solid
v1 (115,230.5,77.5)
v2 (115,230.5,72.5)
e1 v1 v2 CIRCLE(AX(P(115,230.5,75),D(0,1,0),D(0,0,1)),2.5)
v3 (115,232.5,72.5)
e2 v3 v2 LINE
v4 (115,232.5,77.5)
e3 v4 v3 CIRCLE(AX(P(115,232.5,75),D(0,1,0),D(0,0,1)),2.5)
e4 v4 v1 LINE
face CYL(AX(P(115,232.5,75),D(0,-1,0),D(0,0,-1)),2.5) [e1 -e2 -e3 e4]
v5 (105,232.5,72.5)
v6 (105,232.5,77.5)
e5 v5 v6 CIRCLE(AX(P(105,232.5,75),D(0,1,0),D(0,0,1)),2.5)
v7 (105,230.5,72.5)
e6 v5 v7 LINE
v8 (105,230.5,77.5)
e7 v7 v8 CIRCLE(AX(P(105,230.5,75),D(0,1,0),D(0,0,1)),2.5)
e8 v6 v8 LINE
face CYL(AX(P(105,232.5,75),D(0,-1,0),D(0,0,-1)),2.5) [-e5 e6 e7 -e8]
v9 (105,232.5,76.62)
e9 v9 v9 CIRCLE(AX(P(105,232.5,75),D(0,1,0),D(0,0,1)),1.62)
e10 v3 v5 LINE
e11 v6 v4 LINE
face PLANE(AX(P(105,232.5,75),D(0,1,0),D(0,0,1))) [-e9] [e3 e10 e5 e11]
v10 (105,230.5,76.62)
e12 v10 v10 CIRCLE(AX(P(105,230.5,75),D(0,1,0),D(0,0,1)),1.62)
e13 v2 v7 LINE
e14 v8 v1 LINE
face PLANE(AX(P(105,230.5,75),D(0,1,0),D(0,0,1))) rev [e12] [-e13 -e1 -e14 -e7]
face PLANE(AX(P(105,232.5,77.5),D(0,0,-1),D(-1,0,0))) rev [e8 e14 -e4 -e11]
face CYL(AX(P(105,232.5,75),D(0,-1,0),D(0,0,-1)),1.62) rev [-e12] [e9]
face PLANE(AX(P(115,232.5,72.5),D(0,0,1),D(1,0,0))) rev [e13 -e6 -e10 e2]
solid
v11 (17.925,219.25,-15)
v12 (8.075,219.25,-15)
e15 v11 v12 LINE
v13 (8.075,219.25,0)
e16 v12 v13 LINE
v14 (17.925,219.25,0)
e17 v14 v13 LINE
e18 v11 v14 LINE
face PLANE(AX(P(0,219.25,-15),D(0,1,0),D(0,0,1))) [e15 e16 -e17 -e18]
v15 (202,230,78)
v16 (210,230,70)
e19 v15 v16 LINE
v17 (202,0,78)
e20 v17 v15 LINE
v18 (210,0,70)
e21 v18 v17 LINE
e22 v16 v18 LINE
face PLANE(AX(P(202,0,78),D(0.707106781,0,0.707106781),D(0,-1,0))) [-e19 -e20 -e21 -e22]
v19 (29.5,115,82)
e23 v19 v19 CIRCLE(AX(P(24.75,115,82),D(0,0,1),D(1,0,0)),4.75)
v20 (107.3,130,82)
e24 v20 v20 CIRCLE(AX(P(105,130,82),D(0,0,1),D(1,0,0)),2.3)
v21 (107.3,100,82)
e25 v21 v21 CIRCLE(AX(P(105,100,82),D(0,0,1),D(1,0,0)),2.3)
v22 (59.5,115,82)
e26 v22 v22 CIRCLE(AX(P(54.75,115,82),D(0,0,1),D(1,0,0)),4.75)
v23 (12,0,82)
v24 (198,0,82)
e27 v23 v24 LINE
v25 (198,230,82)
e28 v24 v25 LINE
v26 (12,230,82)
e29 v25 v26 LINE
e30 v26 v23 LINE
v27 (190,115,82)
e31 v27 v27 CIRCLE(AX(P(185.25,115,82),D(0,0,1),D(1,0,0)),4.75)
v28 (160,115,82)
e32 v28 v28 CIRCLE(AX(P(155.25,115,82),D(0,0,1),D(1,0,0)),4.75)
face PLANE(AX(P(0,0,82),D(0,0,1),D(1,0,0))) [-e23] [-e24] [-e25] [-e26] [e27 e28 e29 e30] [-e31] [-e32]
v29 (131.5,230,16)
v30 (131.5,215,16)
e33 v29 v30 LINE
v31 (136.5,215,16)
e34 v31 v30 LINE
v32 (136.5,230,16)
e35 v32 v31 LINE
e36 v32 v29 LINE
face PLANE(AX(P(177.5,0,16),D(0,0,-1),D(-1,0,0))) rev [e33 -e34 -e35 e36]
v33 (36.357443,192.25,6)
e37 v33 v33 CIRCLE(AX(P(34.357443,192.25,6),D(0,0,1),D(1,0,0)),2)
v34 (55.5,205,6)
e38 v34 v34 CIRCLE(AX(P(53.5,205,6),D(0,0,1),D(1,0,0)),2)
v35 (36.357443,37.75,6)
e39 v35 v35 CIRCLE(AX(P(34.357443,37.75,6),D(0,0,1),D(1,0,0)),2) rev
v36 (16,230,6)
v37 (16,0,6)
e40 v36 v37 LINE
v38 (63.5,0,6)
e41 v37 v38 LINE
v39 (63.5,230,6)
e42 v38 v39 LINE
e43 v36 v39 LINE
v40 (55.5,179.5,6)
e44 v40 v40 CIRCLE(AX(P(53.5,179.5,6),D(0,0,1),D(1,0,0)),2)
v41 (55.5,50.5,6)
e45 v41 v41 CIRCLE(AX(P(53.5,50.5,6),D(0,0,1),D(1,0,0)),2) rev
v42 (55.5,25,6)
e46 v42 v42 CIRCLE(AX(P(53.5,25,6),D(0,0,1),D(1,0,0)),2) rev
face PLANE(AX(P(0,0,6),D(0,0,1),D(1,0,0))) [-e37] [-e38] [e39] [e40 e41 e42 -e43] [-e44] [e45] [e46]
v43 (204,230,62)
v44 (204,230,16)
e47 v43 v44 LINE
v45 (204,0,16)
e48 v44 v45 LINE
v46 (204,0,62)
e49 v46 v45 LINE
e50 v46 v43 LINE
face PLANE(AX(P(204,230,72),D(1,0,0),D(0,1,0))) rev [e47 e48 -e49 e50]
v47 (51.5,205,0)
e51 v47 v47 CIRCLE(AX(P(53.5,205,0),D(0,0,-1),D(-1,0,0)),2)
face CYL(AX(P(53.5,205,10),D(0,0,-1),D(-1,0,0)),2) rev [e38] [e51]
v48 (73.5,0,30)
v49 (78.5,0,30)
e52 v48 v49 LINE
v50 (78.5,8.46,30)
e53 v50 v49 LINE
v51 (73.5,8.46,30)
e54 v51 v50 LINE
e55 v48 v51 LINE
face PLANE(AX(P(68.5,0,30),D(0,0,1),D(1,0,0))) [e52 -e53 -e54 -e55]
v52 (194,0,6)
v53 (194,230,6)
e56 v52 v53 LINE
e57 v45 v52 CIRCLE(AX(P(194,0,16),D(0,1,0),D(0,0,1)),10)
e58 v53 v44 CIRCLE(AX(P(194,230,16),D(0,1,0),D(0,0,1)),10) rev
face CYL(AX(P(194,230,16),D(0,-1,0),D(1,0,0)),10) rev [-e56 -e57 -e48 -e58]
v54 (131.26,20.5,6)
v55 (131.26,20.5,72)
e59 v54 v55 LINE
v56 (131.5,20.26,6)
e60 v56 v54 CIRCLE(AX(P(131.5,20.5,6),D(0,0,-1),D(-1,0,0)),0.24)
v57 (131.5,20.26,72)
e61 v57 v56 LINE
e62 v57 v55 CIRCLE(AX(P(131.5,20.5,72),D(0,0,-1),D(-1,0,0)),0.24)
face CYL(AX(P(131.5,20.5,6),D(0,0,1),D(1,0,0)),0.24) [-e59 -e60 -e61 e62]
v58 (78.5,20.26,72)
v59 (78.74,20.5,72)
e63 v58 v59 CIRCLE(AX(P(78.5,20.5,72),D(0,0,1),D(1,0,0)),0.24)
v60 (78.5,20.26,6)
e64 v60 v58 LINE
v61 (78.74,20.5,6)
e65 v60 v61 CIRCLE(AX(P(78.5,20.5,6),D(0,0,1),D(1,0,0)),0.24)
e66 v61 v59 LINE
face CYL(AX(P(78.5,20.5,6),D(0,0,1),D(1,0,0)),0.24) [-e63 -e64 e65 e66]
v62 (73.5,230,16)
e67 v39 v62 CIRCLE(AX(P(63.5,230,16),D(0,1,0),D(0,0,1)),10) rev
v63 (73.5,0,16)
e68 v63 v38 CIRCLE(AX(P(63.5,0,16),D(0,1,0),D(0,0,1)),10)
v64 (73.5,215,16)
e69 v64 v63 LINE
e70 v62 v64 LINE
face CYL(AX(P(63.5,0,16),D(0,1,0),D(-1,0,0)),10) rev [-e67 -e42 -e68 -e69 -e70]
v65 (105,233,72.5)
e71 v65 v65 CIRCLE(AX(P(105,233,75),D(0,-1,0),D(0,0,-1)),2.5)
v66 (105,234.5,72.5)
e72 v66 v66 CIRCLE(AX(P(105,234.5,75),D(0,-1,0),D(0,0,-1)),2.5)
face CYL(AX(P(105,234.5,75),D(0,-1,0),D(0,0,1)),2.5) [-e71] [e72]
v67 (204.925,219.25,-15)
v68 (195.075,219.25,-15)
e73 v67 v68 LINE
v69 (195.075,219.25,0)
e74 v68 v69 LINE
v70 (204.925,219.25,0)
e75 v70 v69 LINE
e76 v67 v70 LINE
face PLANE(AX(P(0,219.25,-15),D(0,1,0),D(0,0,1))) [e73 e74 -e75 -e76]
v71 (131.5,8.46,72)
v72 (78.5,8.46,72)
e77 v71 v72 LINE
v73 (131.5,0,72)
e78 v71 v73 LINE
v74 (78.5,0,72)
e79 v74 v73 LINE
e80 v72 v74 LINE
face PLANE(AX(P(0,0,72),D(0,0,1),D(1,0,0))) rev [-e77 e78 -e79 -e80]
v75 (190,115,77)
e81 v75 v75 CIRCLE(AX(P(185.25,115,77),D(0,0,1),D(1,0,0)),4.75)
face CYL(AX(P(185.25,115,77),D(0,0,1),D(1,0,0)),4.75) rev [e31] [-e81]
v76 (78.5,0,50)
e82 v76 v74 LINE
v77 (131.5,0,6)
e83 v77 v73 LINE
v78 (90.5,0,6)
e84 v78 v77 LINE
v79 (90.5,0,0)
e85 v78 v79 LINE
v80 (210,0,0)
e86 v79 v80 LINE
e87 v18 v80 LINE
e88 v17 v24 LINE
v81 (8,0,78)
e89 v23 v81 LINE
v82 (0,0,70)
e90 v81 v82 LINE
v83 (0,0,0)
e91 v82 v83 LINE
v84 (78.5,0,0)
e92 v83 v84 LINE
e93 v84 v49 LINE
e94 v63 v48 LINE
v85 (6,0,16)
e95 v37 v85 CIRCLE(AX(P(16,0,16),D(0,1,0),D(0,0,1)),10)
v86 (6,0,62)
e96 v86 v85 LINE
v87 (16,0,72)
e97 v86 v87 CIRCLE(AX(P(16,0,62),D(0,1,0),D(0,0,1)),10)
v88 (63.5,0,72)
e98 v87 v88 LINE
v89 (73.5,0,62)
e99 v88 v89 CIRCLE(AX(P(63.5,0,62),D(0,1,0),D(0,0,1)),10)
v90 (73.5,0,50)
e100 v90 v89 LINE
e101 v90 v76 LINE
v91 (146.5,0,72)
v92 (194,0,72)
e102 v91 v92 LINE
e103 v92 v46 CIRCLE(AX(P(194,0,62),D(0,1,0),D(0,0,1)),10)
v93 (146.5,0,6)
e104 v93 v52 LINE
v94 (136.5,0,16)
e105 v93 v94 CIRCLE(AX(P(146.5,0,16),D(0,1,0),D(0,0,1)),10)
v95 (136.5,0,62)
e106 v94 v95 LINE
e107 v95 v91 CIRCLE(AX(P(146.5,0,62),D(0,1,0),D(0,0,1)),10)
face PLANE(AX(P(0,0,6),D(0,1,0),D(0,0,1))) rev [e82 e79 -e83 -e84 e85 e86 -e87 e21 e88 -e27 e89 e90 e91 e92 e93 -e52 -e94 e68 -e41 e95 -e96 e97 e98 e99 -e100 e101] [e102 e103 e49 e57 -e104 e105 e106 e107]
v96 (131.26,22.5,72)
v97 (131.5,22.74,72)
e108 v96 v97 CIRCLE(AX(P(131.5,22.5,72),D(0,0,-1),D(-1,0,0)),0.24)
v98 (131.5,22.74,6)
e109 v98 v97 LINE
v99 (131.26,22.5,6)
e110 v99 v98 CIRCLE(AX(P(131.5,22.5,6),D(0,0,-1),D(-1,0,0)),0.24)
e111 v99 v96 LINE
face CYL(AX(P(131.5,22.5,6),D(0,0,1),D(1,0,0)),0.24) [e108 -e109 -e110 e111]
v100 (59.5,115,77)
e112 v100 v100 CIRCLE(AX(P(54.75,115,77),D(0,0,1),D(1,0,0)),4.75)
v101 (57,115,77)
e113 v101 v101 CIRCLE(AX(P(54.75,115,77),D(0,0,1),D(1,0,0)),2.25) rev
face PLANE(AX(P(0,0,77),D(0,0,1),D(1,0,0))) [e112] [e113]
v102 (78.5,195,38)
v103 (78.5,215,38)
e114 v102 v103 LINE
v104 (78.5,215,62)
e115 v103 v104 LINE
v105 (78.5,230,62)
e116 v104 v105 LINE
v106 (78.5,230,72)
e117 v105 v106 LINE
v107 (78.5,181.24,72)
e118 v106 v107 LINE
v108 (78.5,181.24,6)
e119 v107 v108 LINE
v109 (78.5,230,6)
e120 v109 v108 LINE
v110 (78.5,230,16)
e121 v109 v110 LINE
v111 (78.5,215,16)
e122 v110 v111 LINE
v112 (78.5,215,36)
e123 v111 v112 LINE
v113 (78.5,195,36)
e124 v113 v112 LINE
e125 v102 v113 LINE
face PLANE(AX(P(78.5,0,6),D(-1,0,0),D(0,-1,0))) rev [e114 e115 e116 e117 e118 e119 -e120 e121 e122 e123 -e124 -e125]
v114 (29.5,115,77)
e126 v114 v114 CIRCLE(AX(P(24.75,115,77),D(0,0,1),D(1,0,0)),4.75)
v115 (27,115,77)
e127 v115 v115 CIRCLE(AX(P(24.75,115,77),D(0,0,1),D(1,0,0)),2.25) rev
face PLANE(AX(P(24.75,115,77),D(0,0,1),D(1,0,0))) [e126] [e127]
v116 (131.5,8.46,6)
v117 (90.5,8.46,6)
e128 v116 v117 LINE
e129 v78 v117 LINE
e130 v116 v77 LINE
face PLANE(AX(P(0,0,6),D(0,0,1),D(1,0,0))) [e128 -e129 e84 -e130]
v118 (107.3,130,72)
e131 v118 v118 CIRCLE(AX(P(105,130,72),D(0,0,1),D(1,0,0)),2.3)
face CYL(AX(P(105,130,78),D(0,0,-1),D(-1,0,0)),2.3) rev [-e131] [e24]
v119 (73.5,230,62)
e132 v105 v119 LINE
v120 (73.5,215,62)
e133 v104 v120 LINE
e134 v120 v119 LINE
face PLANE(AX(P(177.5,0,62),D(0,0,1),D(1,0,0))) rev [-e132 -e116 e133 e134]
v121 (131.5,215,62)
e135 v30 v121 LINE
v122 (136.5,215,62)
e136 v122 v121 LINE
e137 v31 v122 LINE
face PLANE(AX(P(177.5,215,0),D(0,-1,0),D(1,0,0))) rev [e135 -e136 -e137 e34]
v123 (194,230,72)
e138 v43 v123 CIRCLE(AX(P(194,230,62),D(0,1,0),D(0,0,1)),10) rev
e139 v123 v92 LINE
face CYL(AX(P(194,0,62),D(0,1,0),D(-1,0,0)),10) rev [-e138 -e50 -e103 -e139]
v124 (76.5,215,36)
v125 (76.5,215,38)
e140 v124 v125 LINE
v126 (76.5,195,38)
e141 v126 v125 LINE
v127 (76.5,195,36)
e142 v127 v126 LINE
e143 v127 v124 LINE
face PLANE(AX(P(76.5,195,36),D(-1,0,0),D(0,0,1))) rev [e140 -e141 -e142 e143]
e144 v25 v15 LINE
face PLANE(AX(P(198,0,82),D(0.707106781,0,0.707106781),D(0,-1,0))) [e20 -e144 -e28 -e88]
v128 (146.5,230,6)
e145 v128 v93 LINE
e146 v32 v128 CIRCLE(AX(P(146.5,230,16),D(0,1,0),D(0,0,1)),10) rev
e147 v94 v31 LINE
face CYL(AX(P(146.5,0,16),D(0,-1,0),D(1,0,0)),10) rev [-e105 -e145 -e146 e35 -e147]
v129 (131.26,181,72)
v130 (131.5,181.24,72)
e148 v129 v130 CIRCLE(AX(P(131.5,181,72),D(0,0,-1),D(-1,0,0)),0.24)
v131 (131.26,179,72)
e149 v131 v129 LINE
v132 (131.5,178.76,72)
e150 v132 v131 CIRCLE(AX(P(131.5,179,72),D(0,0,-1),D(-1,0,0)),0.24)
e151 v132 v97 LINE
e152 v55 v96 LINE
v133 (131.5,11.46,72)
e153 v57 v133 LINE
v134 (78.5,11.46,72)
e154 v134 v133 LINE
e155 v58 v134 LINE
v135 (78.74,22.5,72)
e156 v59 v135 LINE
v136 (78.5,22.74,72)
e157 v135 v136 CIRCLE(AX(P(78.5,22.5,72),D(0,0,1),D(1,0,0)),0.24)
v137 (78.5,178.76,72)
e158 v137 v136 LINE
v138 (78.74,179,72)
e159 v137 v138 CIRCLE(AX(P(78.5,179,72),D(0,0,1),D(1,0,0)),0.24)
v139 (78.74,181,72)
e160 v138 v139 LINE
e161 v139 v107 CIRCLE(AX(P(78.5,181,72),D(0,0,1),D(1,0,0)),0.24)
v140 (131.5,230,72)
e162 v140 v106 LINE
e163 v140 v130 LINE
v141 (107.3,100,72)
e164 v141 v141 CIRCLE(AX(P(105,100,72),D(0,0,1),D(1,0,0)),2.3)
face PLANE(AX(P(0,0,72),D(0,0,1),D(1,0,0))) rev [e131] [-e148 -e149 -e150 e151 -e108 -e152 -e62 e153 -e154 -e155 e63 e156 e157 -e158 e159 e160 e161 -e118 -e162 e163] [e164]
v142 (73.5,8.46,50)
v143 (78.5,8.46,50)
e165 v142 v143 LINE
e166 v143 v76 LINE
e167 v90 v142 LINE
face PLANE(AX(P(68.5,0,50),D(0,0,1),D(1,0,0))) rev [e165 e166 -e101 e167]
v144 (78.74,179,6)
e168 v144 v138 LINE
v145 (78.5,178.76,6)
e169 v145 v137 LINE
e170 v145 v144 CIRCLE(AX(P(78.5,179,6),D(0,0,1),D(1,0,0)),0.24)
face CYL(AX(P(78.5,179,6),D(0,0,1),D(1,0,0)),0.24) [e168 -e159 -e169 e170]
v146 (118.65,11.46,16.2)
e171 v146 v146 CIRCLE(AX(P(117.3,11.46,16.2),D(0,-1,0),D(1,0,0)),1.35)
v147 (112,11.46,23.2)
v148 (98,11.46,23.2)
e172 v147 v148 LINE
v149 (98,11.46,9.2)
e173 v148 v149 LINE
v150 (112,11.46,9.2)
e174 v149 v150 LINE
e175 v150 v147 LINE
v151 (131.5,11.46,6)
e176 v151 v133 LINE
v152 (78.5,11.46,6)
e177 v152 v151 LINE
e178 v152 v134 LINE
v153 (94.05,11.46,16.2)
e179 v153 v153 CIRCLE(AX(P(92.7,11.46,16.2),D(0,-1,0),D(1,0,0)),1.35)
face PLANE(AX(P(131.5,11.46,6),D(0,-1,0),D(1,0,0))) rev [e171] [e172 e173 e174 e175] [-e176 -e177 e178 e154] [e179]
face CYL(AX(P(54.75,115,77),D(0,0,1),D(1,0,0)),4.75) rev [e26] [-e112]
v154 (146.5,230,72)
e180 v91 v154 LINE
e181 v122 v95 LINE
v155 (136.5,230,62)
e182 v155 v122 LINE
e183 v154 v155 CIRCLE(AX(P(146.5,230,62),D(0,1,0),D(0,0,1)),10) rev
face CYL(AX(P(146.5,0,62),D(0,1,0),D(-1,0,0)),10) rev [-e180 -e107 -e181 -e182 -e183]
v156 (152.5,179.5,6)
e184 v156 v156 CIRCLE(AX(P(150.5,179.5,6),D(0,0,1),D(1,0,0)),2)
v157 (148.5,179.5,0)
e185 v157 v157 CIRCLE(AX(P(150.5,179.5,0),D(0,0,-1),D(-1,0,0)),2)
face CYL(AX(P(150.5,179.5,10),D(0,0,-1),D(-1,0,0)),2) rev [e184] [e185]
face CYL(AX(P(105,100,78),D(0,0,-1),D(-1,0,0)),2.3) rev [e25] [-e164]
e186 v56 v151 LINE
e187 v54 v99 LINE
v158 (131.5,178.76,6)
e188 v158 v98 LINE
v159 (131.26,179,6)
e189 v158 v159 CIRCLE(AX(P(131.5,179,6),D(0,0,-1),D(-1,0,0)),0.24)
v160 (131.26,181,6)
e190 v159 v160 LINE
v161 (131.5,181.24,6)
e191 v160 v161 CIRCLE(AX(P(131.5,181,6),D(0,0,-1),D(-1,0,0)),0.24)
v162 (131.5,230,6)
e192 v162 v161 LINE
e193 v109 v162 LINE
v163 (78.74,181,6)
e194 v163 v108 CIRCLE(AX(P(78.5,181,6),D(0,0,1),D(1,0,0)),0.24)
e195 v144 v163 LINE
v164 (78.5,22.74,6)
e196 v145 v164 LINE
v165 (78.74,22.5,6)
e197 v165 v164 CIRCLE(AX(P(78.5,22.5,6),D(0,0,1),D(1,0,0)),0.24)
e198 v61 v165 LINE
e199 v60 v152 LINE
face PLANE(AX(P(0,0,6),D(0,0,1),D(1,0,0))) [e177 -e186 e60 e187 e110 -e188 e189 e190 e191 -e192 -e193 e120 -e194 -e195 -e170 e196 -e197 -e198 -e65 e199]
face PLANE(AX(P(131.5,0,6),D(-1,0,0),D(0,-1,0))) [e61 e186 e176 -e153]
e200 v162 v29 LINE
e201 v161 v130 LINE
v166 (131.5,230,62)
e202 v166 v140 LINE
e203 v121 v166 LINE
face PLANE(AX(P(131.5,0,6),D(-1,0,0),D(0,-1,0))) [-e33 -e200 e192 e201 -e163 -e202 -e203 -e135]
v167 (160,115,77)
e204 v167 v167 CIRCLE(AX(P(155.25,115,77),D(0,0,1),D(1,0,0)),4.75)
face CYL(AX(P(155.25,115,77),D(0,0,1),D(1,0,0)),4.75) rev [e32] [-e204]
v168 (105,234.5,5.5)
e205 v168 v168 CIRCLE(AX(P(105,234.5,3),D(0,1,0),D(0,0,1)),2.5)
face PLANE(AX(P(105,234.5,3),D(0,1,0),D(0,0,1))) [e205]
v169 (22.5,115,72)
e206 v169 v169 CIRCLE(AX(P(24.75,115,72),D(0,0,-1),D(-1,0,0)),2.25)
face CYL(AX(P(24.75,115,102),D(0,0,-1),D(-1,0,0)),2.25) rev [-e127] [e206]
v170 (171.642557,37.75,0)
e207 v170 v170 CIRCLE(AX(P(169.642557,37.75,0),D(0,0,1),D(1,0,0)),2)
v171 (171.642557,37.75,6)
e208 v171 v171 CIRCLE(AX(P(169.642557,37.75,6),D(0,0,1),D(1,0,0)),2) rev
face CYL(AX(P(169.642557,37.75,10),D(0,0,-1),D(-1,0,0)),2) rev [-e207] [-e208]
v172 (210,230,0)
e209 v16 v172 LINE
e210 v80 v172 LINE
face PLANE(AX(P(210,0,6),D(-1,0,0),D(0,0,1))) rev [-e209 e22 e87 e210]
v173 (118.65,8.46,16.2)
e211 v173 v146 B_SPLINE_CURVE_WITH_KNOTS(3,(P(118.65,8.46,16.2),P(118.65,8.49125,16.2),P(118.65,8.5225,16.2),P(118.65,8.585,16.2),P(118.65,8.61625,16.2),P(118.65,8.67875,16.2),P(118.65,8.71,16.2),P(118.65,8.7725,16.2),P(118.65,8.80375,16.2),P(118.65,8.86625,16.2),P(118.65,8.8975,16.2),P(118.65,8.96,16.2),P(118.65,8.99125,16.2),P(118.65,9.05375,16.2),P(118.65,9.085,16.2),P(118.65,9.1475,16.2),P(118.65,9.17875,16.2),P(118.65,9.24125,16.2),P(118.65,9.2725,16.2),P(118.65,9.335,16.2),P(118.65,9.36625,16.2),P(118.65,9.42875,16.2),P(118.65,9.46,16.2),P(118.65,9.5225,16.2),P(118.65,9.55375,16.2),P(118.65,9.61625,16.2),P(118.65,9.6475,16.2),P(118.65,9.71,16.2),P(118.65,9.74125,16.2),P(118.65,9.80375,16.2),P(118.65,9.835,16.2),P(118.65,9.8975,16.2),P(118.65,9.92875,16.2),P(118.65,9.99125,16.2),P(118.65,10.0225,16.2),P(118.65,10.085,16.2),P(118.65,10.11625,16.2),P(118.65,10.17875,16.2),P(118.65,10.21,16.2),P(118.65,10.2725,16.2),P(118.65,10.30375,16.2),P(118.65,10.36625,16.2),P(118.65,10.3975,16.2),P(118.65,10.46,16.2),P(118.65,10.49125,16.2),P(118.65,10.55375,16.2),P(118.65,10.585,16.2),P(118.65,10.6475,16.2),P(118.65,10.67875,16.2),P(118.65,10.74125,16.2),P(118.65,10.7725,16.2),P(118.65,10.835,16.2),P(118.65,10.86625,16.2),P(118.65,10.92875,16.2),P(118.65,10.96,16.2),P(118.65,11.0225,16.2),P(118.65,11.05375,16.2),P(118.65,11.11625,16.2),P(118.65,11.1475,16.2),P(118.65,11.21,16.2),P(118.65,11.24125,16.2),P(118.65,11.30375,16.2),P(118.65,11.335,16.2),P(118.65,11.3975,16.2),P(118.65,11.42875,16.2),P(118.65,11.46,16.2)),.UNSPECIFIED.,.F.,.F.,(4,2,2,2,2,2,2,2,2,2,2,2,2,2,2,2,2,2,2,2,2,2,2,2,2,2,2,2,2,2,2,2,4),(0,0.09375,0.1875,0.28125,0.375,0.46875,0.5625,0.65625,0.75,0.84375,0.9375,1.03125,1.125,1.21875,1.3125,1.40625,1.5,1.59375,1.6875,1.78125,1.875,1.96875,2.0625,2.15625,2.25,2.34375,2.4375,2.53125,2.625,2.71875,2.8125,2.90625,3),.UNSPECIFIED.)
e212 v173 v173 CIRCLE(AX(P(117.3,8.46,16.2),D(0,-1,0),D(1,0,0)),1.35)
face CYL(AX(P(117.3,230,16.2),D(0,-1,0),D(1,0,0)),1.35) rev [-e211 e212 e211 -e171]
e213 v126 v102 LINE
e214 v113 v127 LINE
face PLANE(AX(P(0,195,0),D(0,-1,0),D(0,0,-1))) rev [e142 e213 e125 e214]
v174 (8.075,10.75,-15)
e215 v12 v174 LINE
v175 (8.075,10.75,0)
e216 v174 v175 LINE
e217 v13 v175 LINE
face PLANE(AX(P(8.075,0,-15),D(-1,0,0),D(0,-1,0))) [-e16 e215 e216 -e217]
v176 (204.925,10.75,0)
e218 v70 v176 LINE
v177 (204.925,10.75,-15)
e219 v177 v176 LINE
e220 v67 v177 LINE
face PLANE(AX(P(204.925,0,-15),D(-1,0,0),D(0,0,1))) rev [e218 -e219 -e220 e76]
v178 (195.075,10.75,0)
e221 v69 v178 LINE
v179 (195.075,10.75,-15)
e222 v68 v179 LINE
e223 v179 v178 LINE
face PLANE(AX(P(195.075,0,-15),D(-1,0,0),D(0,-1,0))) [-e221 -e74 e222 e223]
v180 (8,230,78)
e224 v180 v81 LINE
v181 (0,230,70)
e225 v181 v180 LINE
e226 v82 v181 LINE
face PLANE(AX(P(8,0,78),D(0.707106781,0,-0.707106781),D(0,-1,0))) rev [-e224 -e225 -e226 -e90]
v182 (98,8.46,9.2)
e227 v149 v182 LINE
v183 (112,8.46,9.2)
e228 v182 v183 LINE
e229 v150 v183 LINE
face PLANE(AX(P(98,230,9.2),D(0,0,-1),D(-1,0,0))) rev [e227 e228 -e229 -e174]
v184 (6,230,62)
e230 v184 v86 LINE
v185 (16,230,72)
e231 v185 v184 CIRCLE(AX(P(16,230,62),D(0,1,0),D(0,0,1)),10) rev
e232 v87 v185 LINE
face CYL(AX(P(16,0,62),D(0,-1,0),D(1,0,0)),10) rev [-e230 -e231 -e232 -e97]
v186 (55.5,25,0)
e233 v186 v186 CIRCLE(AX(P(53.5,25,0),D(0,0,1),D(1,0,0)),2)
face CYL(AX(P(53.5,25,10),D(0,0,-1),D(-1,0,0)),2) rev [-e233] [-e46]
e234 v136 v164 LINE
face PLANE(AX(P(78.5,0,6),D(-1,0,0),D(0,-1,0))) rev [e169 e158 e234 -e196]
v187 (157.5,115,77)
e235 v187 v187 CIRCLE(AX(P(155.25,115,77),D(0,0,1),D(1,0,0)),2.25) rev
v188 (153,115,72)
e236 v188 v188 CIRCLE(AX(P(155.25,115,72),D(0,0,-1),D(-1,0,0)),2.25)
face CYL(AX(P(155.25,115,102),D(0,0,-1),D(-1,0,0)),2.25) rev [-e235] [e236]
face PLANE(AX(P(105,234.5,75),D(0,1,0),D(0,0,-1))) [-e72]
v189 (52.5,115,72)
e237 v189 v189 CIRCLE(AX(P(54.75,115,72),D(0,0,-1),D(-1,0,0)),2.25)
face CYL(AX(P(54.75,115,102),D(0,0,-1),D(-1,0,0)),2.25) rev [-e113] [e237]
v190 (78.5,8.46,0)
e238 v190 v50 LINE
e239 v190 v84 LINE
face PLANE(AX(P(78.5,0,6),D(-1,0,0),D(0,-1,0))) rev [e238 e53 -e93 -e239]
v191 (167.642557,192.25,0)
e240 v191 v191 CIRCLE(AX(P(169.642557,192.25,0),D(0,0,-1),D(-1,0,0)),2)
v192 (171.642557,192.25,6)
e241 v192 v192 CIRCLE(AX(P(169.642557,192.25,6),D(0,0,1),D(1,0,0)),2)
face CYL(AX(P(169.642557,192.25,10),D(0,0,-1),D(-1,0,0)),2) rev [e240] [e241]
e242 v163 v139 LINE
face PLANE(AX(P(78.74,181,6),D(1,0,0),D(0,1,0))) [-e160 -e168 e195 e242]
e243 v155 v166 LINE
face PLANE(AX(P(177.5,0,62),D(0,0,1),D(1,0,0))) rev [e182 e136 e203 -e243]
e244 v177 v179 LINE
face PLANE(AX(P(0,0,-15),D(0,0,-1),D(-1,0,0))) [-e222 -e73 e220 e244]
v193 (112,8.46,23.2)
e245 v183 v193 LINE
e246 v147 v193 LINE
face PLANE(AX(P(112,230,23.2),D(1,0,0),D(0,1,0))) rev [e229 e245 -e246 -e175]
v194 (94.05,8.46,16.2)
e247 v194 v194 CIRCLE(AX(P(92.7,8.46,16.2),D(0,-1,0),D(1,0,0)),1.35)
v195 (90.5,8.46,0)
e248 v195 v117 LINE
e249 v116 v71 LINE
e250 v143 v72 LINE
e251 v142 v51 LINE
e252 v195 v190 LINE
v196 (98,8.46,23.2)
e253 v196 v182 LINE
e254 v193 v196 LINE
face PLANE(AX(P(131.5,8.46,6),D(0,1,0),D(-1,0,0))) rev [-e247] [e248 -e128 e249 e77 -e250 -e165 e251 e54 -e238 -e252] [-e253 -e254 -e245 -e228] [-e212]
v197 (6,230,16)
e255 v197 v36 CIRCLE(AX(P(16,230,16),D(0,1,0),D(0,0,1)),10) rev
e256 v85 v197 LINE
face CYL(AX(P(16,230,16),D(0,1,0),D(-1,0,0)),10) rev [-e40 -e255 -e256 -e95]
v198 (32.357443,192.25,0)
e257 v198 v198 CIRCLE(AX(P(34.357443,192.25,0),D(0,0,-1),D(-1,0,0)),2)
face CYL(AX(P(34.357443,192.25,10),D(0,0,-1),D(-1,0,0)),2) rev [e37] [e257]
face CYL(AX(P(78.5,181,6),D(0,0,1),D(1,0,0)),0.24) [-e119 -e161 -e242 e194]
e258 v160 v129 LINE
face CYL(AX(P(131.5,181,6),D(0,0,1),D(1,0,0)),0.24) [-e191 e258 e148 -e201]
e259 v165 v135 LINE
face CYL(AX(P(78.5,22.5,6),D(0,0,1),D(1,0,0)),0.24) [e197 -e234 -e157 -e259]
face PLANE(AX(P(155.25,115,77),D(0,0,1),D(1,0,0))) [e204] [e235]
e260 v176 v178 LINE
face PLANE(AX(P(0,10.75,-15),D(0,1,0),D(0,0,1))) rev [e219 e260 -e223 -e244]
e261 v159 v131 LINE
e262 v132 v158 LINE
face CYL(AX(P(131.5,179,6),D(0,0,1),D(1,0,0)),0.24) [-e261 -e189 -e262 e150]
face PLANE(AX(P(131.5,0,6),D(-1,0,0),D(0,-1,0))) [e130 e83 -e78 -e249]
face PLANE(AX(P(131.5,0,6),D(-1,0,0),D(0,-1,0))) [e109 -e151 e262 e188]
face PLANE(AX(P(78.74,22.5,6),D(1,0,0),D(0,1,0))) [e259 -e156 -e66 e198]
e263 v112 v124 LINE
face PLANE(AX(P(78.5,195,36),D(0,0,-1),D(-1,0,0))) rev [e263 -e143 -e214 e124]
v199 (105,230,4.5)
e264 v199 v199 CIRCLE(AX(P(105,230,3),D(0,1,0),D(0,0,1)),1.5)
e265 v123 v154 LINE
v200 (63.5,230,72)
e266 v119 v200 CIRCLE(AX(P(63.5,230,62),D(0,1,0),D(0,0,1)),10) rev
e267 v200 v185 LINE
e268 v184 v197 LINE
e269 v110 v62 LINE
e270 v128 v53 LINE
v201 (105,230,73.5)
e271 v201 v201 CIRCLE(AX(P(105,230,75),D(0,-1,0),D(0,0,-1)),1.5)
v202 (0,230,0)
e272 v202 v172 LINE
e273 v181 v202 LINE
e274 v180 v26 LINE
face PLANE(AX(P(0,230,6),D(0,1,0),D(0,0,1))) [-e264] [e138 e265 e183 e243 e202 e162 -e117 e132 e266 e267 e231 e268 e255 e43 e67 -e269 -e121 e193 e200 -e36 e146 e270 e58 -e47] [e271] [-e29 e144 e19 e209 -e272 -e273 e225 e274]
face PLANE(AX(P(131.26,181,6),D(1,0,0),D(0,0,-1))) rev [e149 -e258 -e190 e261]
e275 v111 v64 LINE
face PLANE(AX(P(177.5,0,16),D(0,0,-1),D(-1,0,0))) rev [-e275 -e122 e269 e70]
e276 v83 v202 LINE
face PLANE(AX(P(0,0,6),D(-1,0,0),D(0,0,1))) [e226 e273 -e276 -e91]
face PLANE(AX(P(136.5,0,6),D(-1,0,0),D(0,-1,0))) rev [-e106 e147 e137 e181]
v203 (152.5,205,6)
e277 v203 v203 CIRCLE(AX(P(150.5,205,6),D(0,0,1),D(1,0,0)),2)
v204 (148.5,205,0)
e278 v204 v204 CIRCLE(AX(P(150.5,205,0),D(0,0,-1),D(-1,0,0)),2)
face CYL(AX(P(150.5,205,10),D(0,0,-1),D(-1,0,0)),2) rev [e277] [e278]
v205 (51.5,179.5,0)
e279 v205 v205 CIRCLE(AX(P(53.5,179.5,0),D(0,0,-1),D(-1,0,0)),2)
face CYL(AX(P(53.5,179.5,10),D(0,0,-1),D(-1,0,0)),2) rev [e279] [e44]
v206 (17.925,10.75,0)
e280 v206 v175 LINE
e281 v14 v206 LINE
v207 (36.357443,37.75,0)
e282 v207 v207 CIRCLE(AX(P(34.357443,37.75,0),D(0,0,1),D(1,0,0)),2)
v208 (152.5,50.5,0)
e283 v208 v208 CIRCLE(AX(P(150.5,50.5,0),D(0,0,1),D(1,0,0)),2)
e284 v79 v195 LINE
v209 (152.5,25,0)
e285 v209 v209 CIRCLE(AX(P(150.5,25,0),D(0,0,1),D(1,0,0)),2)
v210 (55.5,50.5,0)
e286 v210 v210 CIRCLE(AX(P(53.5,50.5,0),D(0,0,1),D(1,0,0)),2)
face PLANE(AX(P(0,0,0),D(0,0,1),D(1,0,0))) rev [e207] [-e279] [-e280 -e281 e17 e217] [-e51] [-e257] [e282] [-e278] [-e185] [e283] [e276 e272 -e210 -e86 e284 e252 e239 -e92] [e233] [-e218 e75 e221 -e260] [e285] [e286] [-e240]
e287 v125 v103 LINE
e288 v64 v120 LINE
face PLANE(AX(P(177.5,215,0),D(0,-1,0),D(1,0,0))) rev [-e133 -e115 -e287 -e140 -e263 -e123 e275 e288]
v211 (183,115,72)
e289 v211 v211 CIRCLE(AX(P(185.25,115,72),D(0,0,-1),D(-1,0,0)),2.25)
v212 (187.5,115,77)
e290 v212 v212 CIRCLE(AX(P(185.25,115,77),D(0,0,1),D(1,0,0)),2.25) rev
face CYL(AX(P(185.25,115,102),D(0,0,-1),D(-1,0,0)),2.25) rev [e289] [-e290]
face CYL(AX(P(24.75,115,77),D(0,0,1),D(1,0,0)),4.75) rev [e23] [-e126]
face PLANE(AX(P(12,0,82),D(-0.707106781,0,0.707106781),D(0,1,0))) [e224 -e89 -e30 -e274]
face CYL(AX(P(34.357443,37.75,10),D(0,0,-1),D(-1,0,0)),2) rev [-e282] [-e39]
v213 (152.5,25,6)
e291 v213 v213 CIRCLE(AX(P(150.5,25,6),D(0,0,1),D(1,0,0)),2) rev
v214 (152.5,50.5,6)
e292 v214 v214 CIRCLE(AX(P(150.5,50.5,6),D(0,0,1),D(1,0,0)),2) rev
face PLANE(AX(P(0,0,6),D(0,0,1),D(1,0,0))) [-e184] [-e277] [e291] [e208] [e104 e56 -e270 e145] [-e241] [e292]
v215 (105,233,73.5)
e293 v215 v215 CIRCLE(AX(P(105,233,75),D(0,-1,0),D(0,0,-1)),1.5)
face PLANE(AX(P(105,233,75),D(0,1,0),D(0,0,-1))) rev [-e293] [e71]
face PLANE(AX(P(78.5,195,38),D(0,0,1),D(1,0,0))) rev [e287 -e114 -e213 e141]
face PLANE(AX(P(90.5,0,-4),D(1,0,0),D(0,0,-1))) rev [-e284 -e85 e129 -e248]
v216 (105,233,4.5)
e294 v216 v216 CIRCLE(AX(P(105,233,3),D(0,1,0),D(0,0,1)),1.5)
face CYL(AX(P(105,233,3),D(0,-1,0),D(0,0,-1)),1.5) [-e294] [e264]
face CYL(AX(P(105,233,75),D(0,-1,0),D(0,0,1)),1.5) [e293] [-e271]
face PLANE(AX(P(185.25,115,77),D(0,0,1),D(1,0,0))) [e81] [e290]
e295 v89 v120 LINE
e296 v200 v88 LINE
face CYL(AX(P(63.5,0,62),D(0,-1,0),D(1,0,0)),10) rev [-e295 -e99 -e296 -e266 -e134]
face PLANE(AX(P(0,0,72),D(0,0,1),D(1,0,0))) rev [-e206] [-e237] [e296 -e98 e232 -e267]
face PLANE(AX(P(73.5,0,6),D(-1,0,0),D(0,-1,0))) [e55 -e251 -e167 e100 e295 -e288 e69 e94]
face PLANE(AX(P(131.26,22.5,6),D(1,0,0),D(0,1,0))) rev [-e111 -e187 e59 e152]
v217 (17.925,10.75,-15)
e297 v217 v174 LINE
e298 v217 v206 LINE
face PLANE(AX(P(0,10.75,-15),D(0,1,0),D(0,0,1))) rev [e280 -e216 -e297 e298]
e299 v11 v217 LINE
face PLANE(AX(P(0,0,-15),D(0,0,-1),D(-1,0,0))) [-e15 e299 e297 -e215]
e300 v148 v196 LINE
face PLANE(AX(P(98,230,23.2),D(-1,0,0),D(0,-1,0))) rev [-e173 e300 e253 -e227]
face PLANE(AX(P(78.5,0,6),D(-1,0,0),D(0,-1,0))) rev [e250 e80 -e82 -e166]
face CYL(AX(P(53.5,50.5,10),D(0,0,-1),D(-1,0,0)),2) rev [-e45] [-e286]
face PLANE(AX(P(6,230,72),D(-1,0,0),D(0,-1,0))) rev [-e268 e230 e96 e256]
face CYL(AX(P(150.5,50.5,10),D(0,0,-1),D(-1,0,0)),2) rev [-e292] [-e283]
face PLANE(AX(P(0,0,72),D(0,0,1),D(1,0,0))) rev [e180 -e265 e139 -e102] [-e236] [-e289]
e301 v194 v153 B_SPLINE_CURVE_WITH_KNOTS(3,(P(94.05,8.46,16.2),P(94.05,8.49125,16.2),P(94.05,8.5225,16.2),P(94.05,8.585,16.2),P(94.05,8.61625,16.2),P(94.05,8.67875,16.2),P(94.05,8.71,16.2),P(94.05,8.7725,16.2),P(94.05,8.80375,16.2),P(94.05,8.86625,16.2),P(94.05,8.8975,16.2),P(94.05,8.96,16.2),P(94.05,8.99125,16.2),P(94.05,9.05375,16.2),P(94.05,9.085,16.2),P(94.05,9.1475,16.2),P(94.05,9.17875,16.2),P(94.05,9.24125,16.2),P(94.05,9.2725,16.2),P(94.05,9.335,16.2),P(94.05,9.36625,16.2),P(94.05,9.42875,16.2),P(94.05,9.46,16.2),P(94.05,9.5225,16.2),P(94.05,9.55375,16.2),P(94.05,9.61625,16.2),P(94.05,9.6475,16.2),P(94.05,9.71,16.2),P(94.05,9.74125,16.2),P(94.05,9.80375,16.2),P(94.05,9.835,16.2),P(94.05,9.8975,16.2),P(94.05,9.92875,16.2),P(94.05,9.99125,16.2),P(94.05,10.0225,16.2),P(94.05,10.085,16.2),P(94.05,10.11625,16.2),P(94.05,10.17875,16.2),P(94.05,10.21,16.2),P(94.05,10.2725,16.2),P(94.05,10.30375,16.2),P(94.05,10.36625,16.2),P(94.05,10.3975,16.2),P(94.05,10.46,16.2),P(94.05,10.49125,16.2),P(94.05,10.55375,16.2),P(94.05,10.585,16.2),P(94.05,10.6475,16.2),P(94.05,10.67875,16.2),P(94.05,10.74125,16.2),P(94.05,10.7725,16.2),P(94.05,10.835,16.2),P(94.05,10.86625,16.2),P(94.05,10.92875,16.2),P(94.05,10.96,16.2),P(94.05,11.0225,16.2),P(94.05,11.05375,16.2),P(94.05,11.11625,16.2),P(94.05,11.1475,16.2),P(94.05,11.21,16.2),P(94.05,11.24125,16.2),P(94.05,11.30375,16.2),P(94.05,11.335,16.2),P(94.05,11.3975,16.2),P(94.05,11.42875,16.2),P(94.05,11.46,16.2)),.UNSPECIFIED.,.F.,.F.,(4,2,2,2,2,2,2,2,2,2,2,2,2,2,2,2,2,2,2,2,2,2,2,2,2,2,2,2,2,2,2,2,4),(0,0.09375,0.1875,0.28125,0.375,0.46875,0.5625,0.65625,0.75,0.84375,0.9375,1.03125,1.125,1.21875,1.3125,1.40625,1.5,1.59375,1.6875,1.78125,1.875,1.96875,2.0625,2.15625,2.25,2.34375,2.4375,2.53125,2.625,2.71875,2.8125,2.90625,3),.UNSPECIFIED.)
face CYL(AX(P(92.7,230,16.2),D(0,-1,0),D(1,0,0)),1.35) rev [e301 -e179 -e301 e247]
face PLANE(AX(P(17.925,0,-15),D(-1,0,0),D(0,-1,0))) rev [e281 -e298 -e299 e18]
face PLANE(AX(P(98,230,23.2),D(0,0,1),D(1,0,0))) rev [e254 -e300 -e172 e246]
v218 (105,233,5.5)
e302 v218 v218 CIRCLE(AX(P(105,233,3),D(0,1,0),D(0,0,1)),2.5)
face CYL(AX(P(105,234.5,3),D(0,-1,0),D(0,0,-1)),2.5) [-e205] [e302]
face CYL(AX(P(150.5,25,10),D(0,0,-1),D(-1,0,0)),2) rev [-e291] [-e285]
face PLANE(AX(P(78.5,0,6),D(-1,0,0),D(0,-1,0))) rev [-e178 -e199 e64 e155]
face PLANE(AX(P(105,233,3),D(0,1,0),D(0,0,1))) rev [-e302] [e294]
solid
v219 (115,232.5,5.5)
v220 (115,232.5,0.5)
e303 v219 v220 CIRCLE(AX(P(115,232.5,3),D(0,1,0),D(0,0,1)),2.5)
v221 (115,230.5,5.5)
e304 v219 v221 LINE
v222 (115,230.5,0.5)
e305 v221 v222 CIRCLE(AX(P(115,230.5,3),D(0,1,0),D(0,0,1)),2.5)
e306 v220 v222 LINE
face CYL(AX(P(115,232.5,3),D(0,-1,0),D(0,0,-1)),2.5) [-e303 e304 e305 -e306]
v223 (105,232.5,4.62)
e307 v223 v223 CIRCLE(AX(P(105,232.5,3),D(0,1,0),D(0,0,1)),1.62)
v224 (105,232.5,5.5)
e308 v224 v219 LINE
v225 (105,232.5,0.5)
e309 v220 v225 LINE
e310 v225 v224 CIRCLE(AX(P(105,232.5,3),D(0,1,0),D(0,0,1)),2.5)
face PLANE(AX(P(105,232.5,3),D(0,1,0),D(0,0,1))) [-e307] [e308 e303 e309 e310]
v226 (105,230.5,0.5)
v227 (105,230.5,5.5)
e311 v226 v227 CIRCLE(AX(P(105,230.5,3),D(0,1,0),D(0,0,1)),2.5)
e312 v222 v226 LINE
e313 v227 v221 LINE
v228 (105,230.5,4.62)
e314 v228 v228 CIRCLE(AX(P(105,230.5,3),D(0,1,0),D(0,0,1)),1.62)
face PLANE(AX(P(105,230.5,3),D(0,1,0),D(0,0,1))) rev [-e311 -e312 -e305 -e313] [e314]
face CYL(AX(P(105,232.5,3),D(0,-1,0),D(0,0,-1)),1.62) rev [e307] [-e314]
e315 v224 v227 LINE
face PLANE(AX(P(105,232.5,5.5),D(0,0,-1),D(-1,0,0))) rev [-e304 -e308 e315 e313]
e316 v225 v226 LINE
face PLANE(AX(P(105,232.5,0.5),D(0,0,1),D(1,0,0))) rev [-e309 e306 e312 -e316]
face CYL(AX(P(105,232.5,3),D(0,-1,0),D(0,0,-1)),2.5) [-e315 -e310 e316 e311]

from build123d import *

# Parameters (mm, degrees)
SKETCH_1_W           = 210
SKETCH_1_H           = 230
EXTRUDE_1_DEPTH      = 6
SKETCH_2_W           = 9.85
SKETCH_2_H           = 208.5
EXTRUDE_3_DEPTH      = 15
SKETCH_3_R           = 2
CUT_EXTRUDE_1_DEPTH  = 10
SKETCH_17_W          = 6
SKETCH_17_H          = 230
EXTRUDE_9_DEPTH      = 66
EXTRUDE_10_DEPTH     = 6
CHAMFER_3_SIZE       = 8
SKETCH_19_W          = 5
SKETCH_19_H          = 230
EXTRUDE_11_DEPTH     = 66
FILLET_4_R           = 10
SKETCH_21_R          = 2.3
CUT_EXTRUDE_9_DEPTH  = 6
EXTRUDE_13_DEPTH     = 66
SKETCH_28_W          = 53
SKETCH_28_H          = 3
EXTRUDE_14_DEPTH     = 66
SKETCH_30_W          = 2
SKETCH_30_H          = 2
CUT_EXTRUDE_10_DEPTH = 35
SKETCH_31_R          = 1.35
SKETCH_31_W          = 14
SKETCH_31_H          = 14
CUT_EXTRUDE_11_DEPTH = 316.06185361
SKETCH_34_R          = 2.25
CUT_EXTRUDE_14_DEPTH = 30
SKETCH_36_R          = 2.25
CUT_EXTRUDE_15_DEPTH = 30
SKETCH_39_W          = 46
SKETCH_39_H          = 15
CUT_EXTRUDE_16_DEPTH = 104
SKETCH_40_R          = 1.5
EXTRUDE_16_DEPTH     = 3
SKETCH_41_R          = 2.5
EXTRUDE_17_DEPTH     = 1.5
SKETCH_44_R          = 1.62
EXTRUDE_19_DEPTH     = 2
SKETCH_46_R          = 1.62
EXTRUDE_20_DEPTH     = 2
SKETCH_49_W          = 12
SKETCH_49_H          = 8.46
CUT_EXTRUDE_17_DEPTH = 10
SKETCH_50_W          = 20
SKETCH_50_H          = 8.46
CUT_EXTRUDE_18_DEPTH = 10
SKETCH_51_W          = 194
SKETCH_51_H          = 230
EXTRUDE_22_DEPTH     = 4
CHAMFER_6_SIZE       = 4
CUT_EXTRUDE_START    = -5
SKETCH_54_R          = 4.75
SKETCH_54_R_2        = 2.3
CUT_EXTRUDE_21_DEPTH = 5


with BuildPart() as part:
    # 草图1 → 凸台-拉伸1 (new body)
    with BuildSketch(Plane.XY):
        with Locations((105, 115)):
            Rectangle(SKETCH_1_W, SKETCH_1_H)
    extrude(amount=EXTRUDE_1_DEPTH)

    # 草图2 → 凸台-拉伸3 (add)
    with BuildSketch(Plane(origin=(0, 0, 0), x_dir=(-1, 0, 0), z_dir=(0, 0, -1))):
        with Locations((-200, 115)):
            Rectangle(SKETCH_2_W, SKETCH_2_H)
        with Locations((-13, 115)):
            Rectangle(SKETCH_2_W, SKETCH_2_H)
    extrude(amount=EXTRUDE_3_DEPTH)

    # 草图3 → 切除-拉伸1 (cut)
    with BuildSketch(Plane(origin=(0, 0, 0), x_dir=(-1, 0, 0), z_dir=(0, 0, -1))):
        with Locations((-169.6425573, 192.25)):
            Circle(SKETCH_3_R)
        with Locations((-150.5, 205)):
            Circle(SKETCH_3_R)
        with Locations((-150.5, 179.5)):
            Circle(SKETCH_3_R)
        with Locations(Location((-150.5, 50.5, 0), (0, 0, 180))):
            Circle(SKETCH_3_R)
        with Locations(Location((-150.5, 25, 0), (0, 0, 180))):
            Circle(SKETCH_3_R)
        with Locations(Location((-169.6425573, 37.75, 0), (0, 0, 180))):
            Circle(SKETCH_3_R)
        with Locations((-34.3574427, 192.25)):
            Circle(SKETCH_3_R)
        with Locations((-53.5, 205)):
            Circle(SKETCH_3_R)
        with Locations((-53.5, 179.5)):
            Circle(SKETCH_3_R)
        with Locations(Location((-53.5, 50.5, 0), (0, 0, 180))):
            Circle(SKETCH_3_R)
        with Locations(Location((-53.5, 25, 0), (0, 0, 180))):
            Circle(SKETCH_3_R)
        with Locations(Location((-34.3574427, 37.75, 0), (0, 0, 180))):
            Circle(SKETCH_3_R)
    extrude(amount=-CUT_EXTRUDE_1_DEPTH, mode=Mode.SUBTRACT)

    # 草图17 → 凸台-拉伸9 (add)
    with BuildSketch(Plane.XY.offset(6)):
        with Locations((3, 115)):
            Rectangle(SKETCH_17_W, SKETCH_17_H)
        with Locations((207, 115)):
            Rectangle(SKETCH_17_W, SKETCH_17_H)
    extrude(amount=EXTRUDE_9_DEPTH)

    # 草图18 → 凸台-拉伸10 (add)
    with BuildSketch(Plane.XY.offset(72)):
        Polygon((210, 230), (204, 230), (6, 230), (0, 230), (0, 0), (6, 0), (204, 0), (210, 0), align=None)
    extrude(amount=EXTRUDE_10_DEPTH)

    # 倒角3
    chamfer_3_edges = [part.edges().sort_by_distance(p)[0] for p in [
        (210, 115, 78),
        (0, 115, 78),
    ]]
    chamfer(chamfer_3_edges, length=CHAMFER_3_SIZE)

    # 草图19 → 凸台-拉伸11 (add)
    with BuildSketch(Plane(origin=(0, 0, 72), x_dir=(-1, 0, 0), z_dir=(0, 0, -1))):
        with Locations((-134, 115)):
            Rectangle(SKETCH_19_W, SKETCH_19_H)
        with Locations((-76, 115)):
            Rectangle(SKETCH_19_W, SKETCH_19_H)
    extrude(amount=EXTRUDE_11_DEPTH)

    # 圆角4
    fillet_4_edges = [part.edges().sort_by_distance(p)[0] for p in [
        (6, 115, 6),
        (6, 115, 72),
        (204, 115, 6),
        (204, 115, 72),
        (73.5, 115, 6),
        (73.5, 115, 72),
        (136.5, 115, 72),
        (136.5, 115, 6),
    ]]
    fillet(fillet_4_edges, radius=FILLET_4_R)

    # 草图21 → 切除-拉伸9 (cut)
    with BuildSketch(Plane.XY.offset(72)):
        with Locations((105, 130)):
            Circle(SKETCH_21_R)
        with Locations((105, 100)):
            Circle(SKETCH_21_R)
    extrude(amount=CUT_EXTRUDE_9_DEPTH, mode=Mode.SUBTRACT)

    # 草图26 → 凸台-拉伸13 (add)
    with BuildSketch(Plane(origin=(0, 0, 72), x_dir=(-1, 0, 0), z_dir=(0, 0, -1))):
        with BuildLine():
            Line((-131.26, 181), (-131.26, 179))
            ThreePointArc((-131.26, 179), (-131.5, 178.76), (-131.74, 179))
            Line((-131.74, 179), (-131.74, 181))
            ThreePointArc((-131.74, 181), (-131.5, 181.24), (-131.26, 181))
        make_face()
        with BuildLine():
            Line((-131.26, 22.5), (-131.26, 20.5))
            ThreePointArc((-131.26, 20.5), (-131.5, 20.26), (-131.74, 20.5))
            Line((-131.74, 20.5), (-131.74, 22.5))
            ThreePointArc((-131.74, 22.5), (-131.5, 22.74), (-131.26, 22.5))
        make_face()
    extrude_13 = extrude(amount=EXTRUDE_13_DEPTH)

    # 镜向2: 凸台-拉伸13 across plane
    add(extrude_13.mirror(Plane.ZY.offset(-105)))

    # 草图28 → 凸台-拉伸14 (add)
    with BuildSketch(Plane(origin=(0, 0, 72), x_dir=(-1, 0, 0), z_dir=(0, 0, -1))):
        with Locations((-105, 9.96)):
            Rectangle(SKETCH_28_W, SKETCH_28_H)
    extrude(amount=EXTRUDE_14_DEPTH)

    # 草图30 → 切除-拉伸10 (cut)
    with BuildSketch(Plane(origin=(0, 230, 0), x_dir=(1, 0, 0), z_dir=(0, 1, 0))):
        with Locations((77.5, -37)):
            Rectangle(SKETCH_30_W, SKETCH_30_H)
    extrude(amount=-CUT_EXTRUDE_10_DEPTH, mode=Mode.SUBTRACT)

    # 草图31 → 切除-拉伸11 (cut, through all)
    with BuildSketch(Plane.XZ.offset(-8.46)):
        with Locations((92.7, 16.2)):
            Circle(SKETCH_31_R)
        with Locations((117.3, 16.2)):
            Circle(SKETCH_31_R)
        with Locations((105, 16.2)):
            Rectangle(SKETCH_31_W, SKETCH_31_H)
    extrude(amount=-CUT_EXTRUDE_11_DEPTH, mode=Mode.SUBTRACT)

    # 草图34 → 切除-拉伸14 (cut)
    with BuildSketch(Plane(origin=(0, 0, 72), x_dir=(-1, 0, 0), z_dir=(0, 0, -1))):
        with Locations((-185.25, 115)):
            Circle(SKETCH_34_R)
        with Locations((-155.25, 115)):
            Circle(SKETCH_34_R)
    extrude(amount=-CUT_EXTRUDE_14_DEPTH, mode=Mode.SUBTRACT)

    # 草图36 → 切除-拉伸15 (cut)
    with BuildSketch(Plane(origin=(0, 0, 72), x_dir=(-1, 0, 0), z_dir=(0, 0, -1))):
        with Locations((-54.75, 115)):
            Circle(SKETCH_36_R)
        with Locations((-24.75, 115)):
            Circle(SKETCH_36_R)
    extrude(amount=-CUT_EXTRUDE_15_DEPTH, mode=Mode.SUBTRACT)

    # 草图39 → 切除-拉伸16 (cut)
    with BuildSketch(Plane.ZY.offset(-73.5)):
        with Locations((39, 222.5)):
            Rectangle(SKETCH_39_W, SKETCH_39_H)
    extrude(amount=-CUT_EXTRUDE_16_DEPTH, mode=Mode.SUBTRACT)

    # 草图40 → 凸台-拉伸16 (add)
    with BuildSketch(Plane(origin=(0, 230, 0), x_dir=(1, 0, 0), z_dir=(0, 1, 0))):
        with Locations(Location((105, -3, 0), (0, 0, 270))):
            Circle(SKETCH_40_R)
    extrude_16 = extrude(amount=EXTRUDE_16_DEPTH)

    # 草图41 → 凸台-拉伸17 (add)
    with BuildSketch(Plane(origin=(0, 233, 0), x_dir=(1, 0, 0), z_dir=(0, 1, 0))):
        with Locations(Location((105, -3, 0), (0, 0, 270))):
            Circle(SKETCH_41_R)
    extrude_17 = extrude(amount=EXTRUDE_17_DEPTH)

    # 镜向3: 凸台-拉伸16, 凸台-拉伸17 across plane
    add(extrude_16.mirror(Plane.XY.offset(39)))
    add(extrude_17.mirror(Plane.XY.offset(39)))

    # 草图49 → 切除-拉伸17 (cut)
    with BuildSketch(Plane.XY.offset(6)):
        with Locations((84.5, 4.23)):
            Rectangle(SKETCH_49_W, SKETCH_49_H)
    extrude(amount=-CUT_EXTRUDE_17_DEPTH, mode=Mode.SUBTRACT)

    # 草图50 → 切除-拉伸18 (cut)
    with BuildSketch(Plane(origin=(78.5, 0, 0), x_dir=(0, 0, -1), z_dir=(1, 0, 0))):
        with Locations((-40, 4.23)):
            Rectangle(SKETCH_50_W, SKETCH_50_H)
    extrude(amount=-CUT_EXTRUDE_18_DEPTH, mode=Mode.SUBTRACT)

    # 草图51 → 凸台-拉伸22 (add)
    with BuildSketch(Plane.XY.offset(78)):
        with Locations((105, 115)):
            Rectangle(SKETCH_51_W, SKETCH_51_H)
    extrude(amount=EXTRUDE_22_DEPTH)

    # 倒角6
    chamfer_6_edges = [part.edges().sort_by_distance(p)[0] for p in [
        (202, 115, 82),
        (8, 115, 82),
    ]]
    chamfer(chamfer_6_edges, length=CHAMFER_6_SIZE - 0.0001)  # a hair under: the kernel refuses the full size

    # 草图54 → 切除-拉伸21 (cut)
    with BuildSketch(Plane.XY.offset(82).offset(CUT_EXTRUDE_START)):
        with Locations((54.75, 115)):
            Circle(SKETCH_54_R)
        with Locations((105, 130)):
            Circle(SKETCH_54_R_2)
        with Locations((105, 100)):
            Circle(SKETCH_54_R_2)
        with Locations((24.75, 115)):
            Circle(SKETCH_54_R)
        with Locations((155.25, 115)):
            Circle(SKETCH_54_R)
        with Locations((185.25, 115)):
            Circle(SKETCH_54_R)
    extrude(amount=CUT_EXTRUDE_21_DEPTH, mode=Mode.SUBTRACT)


with BuildPart() as body_2:
    # 草图44 → 凸台-拉伸19 (new body)
    with BuildSketch(Plane(origin=(0, 230.5, 0), x_dir=(1, 0, 0), z_dir=(0, 1, 0))):
        with BuildLine():
            Line((105, -0.5), (115, -0.5))
            ThreePointArc((115, -0.5), (117.5, -3), (115, -5.5))
            Line((115, -5.5), (105, -5.5))
            ThreePointArc((105, -5.5), (102.5, -3), (105, -0.5))
        make_face()
        with Locations(Location((105, -3, 0), (0, 0, 270))):
            Circle(SKETCH_44_R, mode=Mode.SUBTRACT)
    extrude(amount=EXTRUDE_19_DEPTH)


with BuildPart() as body_3:
    # 草图46 → 凸台-拉伸20 (new body)
    with BuildSketch(Plane(origin=(0, 230.5, 0), x_dir=(1, 0, 0), z_dir=(0, 1, 0))):
        with BuildLine():
            Line((115, -72.5), (105, -72.5))
            ThreePointArc((105, -72.5), (102.5, -75), (105, -77.5))
            Line((105, -77.5), (115, -77.5))
            ThreePointArc((115, -77.5), (117.5, -75), (115, -72.5))
        make_face()
        with Locations(Location((105, -75, 0), (0, 0, 270))):
            Circle(SKETCH_46_R, mode=Mode.SUBTRACT)
    extrude(amount=EXTRUDE_20_DEPTH)


solid = Compound([part.part, body_2.part, body_3.part])
